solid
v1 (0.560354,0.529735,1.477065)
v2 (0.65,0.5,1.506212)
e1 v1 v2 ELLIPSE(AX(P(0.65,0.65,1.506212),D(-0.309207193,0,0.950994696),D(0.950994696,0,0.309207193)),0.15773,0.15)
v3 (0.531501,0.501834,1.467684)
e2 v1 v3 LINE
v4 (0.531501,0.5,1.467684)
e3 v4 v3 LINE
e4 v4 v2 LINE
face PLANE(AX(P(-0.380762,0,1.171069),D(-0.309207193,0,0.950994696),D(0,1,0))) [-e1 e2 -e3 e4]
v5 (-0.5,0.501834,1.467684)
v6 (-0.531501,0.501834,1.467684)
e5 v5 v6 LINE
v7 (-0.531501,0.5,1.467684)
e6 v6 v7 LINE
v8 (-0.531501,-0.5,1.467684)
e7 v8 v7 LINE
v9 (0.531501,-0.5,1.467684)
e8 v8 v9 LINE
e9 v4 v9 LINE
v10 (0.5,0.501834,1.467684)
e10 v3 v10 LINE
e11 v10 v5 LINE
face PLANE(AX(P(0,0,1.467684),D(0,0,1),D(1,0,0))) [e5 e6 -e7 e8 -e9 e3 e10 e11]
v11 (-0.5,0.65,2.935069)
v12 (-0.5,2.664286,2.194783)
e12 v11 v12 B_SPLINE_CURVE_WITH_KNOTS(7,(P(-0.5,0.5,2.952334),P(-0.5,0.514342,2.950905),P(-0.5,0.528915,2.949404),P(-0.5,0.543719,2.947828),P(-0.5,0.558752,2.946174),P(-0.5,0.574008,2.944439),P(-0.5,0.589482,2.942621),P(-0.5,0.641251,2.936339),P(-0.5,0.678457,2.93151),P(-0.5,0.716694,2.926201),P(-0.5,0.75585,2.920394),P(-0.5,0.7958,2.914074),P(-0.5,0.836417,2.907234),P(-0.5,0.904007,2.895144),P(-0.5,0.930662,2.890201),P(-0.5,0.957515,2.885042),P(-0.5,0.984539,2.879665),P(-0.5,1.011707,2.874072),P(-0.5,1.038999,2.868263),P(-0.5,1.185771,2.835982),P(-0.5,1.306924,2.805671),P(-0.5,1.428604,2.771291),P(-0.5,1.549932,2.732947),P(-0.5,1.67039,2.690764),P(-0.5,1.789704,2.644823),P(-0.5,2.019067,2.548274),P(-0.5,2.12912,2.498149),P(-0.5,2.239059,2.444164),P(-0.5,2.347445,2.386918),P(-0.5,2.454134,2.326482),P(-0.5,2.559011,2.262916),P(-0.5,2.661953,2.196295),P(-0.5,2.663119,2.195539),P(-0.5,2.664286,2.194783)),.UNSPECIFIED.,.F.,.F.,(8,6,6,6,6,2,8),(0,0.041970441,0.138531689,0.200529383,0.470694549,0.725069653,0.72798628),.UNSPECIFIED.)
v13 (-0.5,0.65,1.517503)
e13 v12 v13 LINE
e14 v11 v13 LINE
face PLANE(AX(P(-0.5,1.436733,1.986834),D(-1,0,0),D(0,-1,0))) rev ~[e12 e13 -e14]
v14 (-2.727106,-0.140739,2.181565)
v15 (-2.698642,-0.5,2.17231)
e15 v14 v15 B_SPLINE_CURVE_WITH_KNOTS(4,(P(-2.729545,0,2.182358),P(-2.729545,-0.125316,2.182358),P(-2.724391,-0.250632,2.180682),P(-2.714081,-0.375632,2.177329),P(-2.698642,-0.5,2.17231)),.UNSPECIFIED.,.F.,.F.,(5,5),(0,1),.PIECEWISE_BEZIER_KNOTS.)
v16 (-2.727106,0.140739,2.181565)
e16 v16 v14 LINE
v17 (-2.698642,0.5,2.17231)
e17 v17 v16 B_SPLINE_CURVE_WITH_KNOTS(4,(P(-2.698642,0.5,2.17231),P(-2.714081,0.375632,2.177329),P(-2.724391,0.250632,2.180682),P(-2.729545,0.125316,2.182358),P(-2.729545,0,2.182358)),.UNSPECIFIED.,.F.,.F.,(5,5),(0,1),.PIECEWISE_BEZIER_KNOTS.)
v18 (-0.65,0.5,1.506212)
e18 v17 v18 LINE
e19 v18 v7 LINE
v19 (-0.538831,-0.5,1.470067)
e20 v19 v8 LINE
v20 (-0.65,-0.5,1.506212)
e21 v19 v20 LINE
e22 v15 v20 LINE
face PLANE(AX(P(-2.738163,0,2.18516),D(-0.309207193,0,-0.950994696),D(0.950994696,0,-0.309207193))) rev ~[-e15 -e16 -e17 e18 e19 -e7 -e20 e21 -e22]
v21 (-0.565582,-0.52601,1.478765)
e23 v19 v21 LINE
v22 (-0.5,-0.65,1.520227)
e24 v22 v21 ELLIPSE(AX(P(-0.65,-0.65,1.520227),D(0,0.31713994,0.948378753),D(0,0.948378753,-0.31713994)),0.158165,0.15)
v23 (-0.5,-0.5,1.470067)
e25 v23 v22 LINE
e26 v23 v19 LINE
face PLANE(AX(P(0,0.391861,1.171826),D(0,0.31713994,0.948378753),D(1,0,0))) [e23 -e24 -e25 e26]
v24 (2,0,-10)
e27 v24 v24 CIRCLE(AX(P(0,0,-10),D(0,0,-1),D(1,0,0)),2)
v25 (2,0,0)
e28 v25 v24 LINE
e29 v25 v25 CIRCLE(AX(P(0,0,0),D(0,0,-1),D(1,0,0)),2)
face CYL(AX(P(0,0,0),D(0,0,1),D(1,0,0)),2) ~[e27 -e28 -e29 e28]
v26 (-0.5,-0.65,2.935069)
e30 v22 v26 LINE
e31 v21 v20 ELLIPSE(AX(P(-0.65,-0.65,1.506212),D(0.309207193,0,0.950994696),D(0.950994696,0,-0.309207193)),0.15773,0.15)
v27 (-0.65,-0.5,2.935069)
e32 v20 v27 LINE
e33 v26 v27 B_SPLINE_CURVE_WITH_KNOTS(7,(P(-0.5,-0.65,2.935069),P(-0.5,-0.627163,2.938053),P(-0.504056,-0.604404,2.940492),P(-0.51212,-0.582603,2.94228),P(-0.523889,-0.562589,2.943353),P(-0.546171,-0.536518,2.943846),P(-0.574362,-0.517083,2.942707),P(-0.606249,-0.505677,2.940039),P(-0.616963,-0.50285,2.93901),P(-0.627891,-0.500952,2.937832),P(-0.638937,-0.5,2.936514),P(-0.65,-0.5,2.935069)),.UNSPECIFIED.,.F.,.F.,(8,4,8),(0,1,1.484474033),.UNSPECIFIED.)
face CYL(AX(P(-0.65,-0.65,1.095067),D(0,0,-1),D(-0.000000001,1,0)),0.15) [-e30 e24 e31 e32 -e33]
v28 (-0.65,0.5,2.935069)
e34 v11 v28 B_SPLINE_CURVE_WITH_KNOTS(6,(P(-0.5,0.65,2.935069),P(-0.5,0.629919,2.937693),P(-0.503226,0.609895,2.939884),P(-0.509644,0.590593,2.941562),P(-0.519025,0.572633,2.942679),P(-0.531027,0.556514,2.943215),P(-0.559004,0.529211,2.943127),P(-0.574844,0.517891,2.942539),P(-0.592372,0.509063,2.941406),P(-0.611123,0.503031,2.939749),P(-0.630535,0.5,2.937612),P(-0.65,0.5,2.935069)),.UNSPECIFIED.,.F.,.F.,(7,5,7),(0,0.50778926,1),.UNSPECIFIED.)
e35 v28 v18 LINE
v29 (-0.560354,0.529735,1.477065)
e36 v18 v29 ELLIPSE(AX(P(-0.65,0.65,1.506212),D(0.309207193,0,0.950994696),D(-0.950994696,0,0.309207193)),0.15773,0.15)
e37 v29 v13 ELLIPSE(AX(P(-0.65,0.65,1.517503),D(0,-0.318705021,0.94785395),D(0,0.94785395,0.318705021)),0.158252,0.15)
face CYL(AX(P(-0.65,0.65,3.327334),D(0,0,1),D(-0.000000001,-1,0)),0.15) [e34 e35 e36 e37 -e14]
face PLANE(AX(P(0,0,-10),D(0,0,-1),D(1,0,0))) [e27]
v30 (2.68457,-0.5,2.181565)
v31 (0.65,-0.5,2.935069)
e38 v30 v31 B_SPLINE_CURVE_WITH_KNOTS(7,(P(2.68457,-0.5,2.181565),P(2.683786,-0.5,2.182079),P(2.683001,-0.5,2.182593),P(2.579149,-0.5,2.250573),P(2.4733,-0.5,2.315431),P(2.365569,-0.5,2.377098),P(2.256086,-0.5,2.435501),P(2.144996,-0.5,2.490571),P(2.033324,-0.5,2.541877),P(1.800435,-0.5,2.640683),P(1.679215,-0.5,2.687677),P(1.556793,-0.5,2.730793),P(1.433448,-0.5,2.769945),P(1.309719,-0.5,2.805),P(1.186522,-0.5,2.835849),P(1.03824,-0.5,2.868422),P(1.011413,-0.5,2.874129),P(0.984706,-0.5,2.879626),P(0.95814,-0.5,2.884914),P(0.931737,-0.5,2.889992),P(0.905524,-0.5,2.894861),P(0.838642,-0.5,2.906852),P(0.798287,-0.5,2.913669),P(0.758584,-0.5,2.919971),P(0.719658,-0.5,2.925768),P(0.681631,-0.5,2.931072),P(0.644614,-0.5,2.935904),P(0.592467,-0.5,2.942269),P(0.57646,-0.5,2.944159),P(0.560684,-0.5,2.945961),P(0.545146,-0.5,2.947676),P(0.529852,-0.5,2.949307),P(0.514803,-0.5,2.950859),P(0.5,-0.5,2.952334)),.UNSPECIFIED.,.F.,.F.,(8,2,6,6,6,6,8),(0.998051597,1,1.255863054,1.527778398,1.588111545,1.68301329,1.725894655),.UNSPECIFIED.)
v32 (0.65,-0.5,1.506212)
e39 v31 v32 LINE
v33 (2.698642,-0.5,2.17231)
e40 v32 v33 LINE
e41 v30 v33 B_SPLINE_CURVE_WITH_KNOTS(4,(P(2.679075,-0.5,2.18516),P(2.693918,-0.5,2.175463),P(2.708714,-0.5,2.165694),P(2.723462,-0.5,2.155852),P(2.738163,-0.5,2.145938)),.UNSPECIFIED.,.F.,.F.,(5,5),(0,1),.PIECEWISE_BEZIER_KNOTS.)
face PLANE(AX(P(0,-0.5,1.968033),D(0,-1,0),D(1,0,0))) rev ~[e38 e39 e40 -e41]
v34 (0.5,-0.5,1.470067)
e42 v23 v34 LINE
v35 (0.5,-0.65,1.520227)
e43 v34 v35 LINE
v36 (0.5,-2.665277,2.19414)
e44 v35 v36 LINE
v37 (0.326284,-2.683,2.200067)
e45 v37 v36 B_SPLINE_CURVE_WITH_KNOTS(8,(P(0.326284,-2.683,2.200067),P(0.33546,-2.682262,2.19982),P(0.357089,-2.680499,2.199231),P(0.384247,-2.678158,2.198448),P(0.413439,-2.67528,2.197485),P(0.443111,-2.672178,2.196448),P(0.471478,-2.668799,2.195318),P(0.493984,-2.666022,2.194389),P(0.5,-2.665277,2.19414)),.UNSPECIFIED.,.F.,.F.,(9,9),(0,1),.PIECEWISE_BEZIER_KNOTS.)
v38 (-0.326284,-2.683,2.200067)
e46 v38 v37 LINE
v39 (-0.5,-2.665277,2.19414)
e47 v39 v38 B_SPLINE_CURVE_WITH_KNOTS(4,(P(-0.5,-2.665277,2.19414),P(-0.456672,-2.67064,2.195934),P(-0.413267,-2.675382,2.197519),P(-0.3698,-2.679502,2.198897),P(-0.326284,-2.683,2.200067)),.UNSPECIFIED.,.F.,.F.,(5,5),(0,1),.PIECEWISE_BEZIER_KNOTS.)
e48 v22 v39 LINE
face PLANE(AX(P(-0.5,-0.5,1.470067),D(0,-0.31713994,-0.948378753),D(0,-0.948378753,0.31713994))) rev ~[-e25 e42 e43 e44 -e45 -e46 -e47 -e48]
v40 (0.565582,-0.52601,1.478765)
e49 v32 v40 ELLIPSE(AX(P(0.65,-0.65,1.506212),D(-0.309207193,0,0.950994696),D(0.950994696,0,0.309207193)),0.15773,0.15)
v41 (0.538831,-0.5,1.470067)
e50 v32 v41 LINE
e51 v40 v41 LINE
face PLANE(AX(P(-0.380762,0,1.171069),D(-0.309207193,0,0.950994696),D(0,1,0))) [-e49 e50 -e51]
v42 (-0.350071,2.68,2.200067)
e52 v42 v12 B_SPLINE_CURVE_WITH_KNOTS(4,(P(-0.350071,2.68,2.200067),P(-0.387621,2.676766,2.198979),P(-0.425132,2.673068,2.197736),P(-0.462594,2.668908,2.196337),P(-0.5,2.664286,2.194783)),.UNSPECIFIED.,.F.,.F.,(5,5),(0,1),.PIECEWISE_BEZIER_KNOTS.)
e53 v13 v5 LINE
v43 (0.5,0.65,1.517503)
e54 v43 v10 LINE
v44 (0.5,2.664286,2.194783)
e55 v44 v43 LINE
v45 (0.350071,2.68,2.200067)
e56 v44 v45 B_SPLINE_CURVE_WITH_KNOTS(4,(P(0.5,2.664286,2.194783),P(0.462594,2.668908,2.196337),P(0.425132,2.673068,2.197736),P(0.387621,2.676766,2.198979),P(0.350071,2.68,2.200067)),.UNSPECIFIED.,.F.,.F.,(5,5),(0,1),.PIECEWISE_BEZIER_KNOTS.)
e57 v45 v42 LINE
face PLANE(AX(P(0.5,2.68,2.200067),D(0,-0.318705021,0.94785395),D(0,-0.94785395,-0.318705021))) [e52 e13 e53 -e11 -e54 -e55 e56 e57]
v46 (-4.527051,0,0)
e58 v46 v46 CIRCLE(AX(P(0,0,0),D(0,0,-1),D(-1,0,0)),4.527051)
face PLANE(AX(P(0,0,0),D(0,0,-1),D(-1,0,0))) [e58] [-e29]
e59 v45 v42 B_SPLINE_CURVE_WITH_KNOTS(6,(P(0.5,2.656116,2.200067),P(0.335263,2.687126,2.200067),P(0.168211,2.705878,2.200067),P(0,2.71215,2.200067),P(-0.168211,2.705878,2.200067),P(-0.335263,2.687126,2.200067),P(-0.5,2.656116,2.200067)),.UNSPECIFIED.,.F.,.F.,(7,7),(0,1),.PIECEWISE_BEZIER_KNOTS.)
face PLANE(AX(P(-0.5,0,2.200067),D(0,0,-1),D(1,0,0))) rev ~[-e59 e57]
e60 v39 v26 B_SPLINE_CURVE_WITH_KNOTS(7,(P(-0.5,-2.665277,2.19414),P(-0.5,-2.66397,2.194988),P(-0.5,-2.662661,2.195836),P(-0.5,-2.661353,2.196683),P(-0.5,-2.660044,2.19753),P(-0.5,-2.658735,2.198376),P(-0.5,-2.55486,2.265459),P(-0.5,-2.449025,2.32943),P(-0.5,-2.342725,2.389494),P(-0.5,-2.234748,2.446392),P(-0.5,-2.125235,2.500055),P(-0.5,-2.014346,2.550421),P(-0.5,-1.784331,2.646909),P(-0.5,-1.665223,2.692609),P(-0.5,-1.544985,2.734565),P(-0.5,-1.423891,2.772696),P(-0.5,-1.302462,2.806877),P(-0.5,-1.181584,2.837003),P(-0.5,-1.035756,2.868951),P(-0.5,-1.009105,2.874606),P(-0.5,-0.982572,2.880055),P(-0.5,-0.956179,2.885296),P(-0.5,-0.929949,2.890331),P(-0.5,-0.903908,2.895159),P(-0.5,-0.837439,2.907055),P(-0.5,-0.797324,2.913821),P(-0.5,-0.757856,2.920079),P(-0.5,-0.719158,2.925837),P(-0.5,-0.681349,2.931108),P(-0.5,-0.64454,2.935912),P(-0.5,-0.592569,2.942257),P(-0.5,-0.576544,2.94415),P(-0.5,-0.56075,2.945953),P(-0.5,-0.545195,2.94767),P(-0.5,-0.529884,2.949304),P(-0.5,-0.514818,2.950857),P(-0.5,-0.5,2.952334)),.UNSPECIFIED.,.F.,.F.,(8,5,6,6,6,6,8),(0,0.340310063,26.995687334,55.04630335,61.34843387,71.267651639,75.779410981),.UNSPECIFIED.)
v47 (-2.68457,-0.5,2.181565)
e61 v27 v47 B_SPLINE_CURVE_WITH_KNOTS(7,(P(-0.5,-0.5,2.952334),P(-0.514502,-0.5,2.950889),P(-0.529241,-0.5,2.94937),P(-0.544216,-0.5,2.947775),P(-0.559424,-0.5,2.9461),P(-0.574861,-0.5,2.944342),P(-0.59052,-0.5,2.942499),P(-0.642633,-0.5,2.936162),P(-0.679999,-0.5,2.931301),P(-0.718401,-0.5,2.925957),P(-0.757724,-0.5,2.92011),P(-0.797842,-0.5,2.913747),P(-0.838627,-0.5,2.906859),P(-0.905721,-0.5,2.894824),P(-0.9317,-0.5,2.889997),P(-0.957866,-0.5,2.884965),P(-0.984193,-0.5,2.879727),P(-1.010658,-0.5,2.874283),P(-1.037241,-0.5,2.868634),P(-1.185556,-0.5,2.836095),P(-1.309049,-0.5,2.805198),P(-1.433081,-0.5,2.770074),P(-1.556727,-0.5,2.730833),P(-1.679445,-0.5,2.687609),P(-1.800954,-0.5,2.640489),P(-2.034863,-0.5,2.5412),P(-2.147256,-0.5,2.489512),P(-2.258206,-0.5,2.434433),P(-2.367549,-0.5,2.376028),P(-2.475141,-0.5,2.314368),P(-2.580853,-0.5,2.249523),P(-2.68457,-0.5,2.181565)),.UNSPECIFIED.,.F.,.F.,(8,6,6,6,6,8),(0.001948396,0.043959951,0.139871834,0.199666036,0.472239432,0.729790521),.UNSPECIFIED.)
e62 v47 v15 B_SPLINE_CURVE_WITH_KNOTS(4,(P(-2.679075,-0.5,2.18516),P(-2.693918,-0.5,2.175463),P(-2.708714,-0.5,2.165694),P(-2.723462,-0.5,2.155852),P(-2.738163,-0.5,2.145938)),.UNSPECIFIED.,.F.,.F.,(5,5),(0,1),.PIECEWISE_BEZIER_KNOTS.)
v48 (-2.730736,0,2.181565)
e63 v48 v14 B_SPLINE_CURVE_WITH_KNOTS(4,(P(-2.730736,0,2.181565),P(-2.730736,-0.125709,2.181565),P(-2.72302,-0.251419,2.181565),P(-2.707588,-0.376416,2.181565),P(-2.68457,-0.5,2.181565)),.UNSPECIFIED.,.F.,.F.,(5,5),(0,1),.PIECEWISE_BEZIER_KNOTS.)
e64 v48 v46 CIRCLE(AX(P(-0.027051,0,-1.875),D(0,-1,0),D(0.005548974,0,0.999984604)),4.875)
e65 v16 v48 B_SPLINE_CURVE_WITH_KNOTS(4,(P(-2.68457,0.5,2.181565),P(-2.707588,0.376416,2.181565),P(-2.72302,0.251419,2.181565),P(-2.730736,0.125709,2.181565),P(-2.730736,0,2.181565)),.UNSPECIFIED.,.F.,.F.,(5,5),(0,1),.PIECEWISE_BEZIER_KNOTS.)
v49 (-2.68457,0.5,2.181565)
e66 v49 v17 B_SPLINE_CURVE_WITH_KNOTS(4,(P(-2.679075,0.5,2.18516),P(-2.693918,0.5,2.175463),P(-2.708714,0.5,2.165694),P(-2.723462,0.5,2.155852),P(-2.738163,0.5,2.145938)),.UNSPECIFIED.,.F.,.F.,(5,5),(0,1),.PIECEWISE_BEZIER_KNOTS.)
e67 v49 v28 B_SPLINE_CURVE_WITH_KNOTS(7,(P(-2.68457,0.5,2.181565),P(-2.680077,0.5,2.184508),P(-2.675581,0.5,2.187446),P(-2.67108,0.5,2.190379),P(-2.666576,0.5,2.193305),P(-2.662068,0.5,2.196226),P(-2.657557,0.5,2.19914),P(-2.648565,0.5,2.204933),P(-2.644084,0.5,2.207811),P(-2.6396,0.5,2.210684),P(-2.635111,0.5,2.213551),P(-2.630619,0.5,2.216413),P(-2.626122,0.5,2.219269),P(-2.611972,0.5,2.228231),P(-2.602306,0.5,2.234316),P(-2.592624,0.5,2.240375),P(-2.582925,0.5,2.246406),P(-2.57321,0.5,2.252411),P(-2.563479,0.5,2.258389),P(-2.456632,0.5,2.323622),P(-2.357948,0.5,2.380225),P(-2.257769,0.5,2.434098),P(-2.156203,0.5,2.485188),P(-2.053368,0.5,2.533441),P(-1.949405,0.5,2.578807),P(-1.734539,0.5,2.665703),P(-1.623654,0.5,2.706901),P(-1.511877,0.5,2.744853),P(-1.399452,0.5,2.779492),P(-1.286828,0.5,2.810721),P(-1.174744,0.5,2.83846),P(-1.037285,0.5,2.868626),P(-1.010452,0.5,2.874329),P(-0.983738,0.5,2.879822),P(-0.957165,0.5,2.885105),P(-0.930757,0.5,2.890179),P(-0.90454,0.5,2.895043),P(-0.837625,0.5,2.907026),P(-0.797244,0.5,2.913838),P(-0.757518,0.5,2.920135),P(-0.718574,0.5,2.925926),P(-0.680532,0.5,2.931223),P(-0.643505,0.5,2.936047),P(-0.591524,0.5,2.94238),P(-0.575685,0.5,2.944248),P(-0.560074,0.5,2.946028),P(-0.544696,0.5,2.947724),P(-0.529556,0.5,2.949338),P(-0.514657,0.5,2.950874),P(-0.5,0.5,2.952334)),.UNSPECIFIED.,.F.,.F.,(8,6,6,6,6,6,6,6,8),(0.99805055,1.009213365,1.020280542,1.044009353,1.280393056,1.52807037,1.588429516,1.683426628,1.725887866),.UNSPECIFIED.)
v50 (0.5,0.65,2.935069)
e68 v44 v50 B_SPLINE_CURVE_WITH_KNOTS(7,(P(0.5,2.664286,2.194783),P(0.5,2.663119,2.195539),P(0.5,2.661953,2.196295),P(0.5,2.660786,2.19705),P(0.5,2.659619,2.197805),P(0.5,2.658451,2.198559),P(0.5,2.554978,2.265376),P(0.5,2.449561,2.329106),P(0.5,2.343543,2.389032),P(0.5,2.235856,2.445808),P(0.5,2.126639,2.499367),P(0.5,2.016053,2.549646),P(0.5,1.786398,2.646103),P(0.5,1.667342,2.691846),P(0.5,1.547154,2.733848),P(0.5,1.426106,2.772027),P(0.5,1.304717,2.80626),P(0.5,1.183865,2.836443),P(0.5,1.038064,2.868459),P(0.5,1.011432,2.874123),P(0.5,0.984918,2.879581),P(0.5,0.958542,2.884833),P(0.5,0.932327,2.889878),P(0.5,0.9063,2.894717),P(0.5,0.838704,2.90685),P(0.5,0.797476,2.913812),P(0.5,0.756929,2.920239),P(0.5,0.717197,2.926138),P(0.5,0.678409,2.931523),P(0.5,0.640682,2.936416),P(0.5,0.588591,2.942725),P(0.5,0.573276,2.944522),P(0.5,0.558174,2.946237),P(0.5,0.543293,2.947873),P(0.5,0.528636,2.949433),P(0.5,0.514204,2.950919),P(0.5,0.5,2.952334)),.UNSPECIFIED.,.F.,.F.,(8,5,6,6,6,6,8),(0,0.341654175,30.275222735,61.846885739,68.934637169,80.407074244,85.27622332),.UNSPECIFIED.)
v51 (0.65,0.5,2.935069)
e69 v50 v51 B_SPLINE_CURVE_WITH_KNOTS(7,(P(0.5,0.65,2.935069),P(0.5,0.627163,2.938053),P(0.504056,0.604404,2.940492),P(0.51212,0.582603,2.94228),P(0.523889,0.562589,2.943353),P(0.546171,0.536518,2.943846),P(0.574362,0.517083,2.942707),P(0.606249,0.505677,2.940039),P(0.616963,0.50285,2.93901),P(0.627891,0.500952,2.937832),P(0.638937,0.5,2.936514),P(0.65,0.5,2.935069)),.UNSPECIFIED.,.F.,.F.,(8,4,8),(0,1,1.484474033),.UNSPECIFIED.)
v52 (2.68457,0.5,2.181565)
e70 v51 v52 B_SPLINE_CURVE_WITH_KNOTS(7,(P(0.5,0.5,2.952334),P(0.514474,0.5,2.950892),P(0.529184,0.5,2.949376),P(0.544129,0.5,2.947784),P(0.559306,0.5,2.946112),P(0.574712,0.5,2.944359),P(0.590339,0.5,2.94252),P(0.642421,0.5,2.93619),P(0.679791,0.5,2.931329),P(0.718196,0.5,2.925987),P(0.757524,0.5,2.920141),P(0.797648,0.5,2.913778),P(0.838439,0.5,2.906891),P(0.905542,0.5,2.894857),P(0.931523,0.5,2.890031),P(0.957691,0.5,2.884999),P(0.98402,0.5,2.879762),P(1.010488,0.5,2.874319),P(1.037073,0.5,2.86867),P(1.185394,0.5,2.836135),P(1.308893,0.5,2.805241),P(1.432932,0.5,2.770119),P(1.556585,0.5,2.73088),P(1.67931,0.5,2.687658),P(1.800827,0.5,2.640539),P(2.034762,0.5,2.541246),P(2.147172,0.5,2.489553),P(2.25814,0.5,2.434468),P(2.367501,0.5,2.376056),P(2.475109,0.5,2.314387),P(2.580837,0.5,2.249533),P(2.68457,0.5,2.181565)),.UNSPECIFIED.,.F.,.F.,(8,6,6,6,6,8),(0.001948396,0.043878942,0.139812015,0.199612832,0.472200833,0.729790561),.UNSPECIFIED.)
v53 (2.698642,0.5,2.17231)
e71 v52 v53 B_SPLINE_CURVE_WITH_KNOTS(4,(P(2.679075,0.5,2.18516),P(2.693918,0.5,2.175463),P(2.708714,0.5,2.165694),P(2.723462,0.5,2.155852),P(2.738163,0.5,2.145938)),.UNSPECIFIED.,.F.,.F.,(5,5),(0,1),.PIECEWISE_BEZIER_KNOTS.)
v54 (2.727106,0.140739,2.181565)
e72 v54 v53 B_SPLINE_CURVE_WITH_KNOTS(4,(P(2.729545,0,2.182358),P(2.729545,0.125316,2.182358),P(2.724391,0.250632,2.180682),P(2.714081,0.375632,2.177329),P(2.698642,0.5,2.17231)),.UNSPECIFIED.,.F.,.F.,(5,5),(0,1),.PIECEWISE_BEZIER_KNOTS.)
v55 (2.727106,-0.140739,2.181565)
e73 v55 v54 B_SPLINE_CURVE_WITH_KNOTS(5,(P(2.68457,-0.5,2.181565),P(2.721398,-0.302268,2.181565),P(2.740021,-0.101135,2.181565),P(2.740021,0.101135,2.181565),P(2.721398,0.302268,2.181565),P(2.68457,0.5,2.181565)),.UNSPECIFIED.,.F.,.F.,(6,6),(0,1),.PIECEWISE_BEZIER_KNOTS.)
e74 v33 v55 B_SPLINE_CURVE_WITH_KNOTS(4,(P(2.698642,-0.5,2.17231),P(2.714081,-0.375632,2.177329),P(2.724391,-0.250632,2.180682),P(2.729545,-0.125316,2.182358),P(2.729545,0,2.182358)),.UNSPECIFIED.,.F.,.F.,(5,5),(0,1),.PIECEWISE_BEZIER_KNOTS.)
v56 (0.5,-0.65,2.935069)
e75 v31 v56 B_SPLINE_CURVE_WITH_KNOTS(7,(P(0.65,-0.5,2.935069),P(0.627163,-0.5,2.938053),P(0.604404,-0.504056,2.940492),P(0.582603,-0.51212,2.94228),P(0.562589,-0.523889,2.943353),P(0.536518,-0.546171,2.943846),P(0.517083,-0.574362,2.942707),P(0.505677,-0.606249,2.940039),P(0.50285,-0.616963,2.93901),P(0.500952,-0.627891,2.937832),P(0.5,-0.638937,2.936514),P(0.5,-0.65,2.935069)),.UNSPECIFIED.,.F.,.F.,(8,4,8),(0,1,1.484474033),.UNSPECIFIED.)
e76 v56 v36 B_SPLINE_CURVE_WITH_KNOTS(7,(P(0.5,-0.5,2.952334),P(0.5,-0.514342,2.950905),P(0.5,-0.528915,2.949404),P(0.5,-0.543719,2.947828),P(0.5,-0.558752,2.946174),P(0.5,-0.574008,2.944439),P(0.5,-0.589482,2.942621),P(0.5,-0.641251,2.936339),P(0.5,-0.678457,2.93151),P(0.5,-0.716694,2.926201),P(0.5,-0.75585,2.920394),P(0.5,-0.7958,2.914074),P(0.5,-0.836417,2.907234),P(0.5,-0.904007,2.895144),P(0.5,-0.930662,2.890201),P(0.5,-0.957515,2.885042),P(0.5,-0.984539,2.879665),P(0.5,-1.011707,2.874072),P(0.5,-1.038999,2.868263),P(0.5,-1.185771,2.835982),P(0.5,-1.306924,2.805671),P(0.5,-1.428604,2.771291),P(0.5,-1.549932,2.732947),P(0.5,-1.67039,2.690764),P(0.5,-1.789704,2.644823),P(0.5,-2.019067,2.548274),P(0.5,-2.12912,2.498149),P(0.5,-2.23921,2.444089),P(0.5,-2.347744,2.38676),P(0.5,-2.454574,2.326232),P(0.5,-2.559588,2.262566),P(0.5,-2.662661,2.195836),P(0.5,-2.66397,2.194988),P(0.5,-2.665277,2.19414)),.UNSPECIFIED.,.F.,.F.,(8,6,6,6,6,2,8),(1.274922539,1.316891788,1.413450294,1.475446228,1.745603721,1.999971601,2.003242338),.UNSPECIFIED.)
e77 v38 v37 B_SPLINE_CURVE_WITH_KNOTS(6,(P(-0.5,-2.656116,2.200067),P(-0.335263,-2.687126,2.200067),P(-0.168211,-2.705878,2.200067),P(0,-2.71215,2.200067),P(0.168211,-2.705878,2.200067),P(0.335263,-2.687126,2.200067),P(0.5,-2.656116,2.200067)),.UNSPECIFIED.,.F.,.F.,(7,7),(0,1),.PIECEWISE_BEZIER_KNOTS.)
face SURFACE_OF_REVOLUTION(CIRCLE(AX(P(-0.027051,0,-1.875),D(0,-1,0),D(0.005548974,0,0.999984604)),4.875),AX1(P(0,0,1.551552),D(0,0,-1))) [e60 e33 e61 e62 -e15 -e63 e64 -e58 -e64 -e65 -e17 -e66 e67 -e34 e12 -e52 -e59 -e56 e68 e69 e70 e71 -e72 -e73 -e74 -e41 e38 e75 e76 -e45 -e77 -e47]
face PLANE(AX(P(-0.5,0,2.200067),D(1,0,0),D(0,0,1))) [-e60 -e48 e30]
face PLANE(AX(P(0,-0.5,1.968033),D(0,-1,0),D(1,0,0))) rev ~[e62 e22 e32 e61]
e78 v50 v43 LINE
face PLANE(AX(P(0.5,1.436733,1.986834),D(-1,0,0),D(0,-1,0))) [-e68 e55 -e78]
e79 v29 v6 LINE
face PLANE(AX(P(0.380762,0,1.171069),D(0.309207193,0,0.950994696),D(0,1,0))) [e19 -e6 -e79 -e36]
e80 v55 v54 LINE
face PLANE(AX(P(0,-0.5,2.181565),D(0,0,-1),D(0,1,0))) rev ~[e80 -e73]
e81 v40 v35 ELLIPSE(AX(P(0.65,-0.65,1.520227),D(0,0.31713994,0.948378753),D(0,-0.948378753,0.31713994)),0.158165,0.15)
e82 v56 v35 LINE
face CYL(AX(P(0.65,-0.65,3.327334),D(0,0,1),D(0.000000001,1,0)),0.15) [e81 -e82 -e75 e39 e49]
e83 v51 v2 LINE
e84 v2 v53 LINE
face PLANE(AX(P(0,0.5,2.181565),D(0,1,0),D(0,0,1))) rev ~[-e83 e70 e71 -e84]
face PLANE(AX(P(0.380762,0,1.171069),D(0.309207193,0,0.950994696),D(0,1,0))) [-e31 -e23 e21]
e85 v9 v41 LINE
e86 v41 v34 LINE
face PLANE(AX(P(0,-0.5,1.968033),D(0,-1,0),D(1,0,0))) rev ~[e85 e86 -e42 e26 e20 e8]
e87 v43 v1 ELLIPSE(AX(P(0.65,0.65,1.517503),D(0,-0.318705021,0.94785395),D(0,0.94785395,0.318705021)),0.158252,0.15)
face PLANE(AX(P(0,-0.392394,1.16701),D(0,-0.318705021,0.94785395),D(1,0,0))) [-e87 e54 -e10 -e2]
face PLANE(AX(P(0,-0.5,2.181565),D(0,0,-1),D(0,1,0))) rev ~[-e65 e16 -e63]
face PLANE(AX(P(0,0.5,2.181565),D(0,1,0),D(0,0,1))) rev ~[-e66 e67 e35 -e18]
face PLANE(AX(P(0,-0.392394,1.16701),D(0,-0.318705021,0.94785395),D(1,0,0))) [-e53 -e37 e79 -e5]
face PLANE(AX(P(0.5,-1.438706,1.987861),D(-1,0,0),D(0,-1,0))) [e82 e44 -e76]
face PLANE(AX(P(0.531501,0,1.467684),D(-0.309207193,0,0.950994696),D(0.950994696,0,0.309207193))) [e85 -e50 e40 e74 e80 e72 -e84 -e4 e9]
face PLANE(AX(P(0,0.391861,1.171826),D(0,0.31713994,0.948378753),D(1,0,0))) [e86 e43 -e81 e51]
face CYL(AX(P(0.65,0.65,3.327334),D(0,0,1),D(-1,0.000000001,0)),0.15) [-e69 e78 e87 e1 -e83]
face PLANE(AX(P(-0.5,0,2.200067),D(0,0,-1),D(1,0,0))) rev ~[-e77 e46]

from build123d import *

# Parameters (mm, degrees)
F3_R           = 2
F4_DEPTH       = 10
F5_W           = 1
F5_H           = 0.8
F6_DEPTH       = 3
F6_DEPTH_BACK  = 3
F7_W           = 1
F7_H           = 0.8
F8_DEPTH       = 3
F8_DEPTH_BACK  = 3
F10_DEPTH      = 0.5
F10_DEPTH_BACK = 0.5
F11_T4_DEPTH   = 1
F12_T1_DEPTH   = 1
F13_T4_DEPTH   = 2.2322667456
F13_T10_DEPTH  = 1.8596499945
F13_T16_DEPTH  = 2.2322667452
F13_T22_DEPTH  = 1.859649995


# Not quite as in the source:
# - a fillet or chamfer that OpenCascade refuses, or shapes differently, is made with other operations: its cross-section is extruded or revolved along the edge and cut away or added


with BuildPart() as f2:
    # F0 (on Front) → F2 (revolve)
    with BuildSketch(Plane.XZ):
        with BuildLine():
            Line((0, 0), (0, 2.9999249461))
            ThreePointArc((0, 2.9999249461), (-2.7199502547, 2.1887322683), (-4.5270512497, 0))
            Line((-4.5270512497, 0), (0, 0))
        make_face()
    revolve(axis=Axis((0, 0, 1.5515517443), (0, 0, -1)))

    # F3 (on face) → F4 (join)
    with BuildSketch(Plane(origin=(0, 0, 0), x_dir=(1, 0, 0), z_dir=(0, 0, -1))):
        Circle(F3_R)
    extrude(amount=F4_DEPTH)

    # F5 (on Front) → F6 (cut, two sides)
    with BuildSketch(Plane.XZ) as f6_sk:
        with Locations((0, 2.6000668348)):
            Rectangle(F5_W, F5_H)
    extrude(amount=-F6_DEPTH, mode=Mode.SUBTRACT)
    extrude(f6_sk.sketch, amount=F6_DEPTH_BACK, mode=Mode.SUBTRACT)

    # F7 (on Right) → F8 (cut, two sides)
    with BuildSketch(Plane.YZ) as f8_sk:
        with Locations((0, 2.5815645484)):
            Rectangle(F7_W, F7_H)
    extrude(amount=F8_DEPTH, mode=Mode.SUBTRACT)
    extrude(f8_sk.sketch, amount=-F8_DEPTH_BACK, mode=Mode.SUBTRACT)

    # F9 (on Front) → F10 (cut, two sides)
    with BuildSketch(Plane.XZ) as f10_sk:
        Polygon((0.5315009621, 1.4676835854), (2.7381633418, 2.1851595957), (-2.7381633418, 2.1851595957), (-0.5315009621, 1.4676835854), (0, 1.4676835854), align=None)
    extrude(amount=F10_DEPTH, mode=Mode.SUBTRACT)
    extrude(f10_sk.sketch, amount=-F10_DEPTH_BACK, mode=Mode.SUBTRACT)

    # F11: chamfer of 0.733 x 2.18 on 1 edges, made by hand


with BuildPart() as f11_tool2:
    # F11_s3 → F11_t4 (new body)
    with BuildSketch(Plane.YZ.offset(0.5)):
        Polygon((2.68, 2.2000668348), (0.5, 1.4670668348), (0.5, 2.2000668348), align=None)
    extrude(amount=-F11_T4_DEPTH)

    split(bisect_by=Plane.XY.offset(1.4676835854), keep=Keep.TOP)


with BuildPart() as f2_1:
    add(f2.part)

    # F11_t1: cut F11_tool2
    add(f11_tool2.part, mode=Mode.SUBTRACT)

    # F12: chamfer of 2.183 x 0.73 on 1 edges, made by hand

    # F12_s2 → F12_t1 (cut)
    with BuildSketch(Plane.YZ.offset(-0.5)):
        Polygon((-0.5, 1.4700668348), (-2.683, 2.2000668348), (-0.5, 2.2000668348), align=None)
    extrude(amount=F12_T1_DEPTH, mode=Mode.SUBTRACT)

    # F13: fillet of radius 0.15 on 4 edges, made by hand


with BuildPart() as f13_tool2:
    # F13_s3 → F13_t4 (new body)
    with BuildSketch(Plane.XY.offset(3.3273335804)):
        with BuildLine():
            ThreePointArc((0.65, -0.5), (0.5439339828, -0.5439339828), (0.5, -0.65))
            Line((0.5, -0.65), (0.5, -0.5))
            Line((0.5, -0.5), (0.65, -0.5))
        make_face()
    extrude(amount=-F13_T4_DEPTH)

    split(bisect_by=Plane(origin=(-0.3807624945, 0, 1.1710694992), x_dir=(0, 1, 0), z_dir=(-0.309207193, 0, 0.950994696)), keep=Keep.TOP)

    split(bisect_by=Plane(origin=(0, 0.3918613388, 1.1718264421), x_dir=(1, 0, 0), z_dir=(0, 0.3171399402, 0.9483787526)), keep=Keep.TOP)


with BuildPart() as f2_2:
    add(f2_1.part)

    # F13_t1: cut F13_tool2
    add(f13_tool2.part, mode=Mode.SUBTRACT)


with BuildPart() as f13_tool8:
    # F13_s9 → F13_t10 (new body)
    with BuildSketch(Plane.XY.offset(3.3273335799)):
        with BuildLine():
            ThreePointArc((0.5, 0.65), (0.5439339828, 0.5439339828), (0.65, 0.5))
            Line((0.65, 0.5), (0.5, 0.5))
            Line((0.5, 0.5), (0.5, 0.65))
        make_face()
    extrude(amount=-F13_T10_DEPTH)

    split(bisect_by=Plane(origin=(0, -0.3923936318, 1.16700971), x_dir=(1, 0, 0), z_dir=(0, -0.3187050207, 0.9478539496)), keep=Keep.TOP)

    split(bisect_by=Plane(origin=(-0.3807624945, 0, 1.1710694992), x_dir=(0, 1, 0), z_dir=(-0.309207193, 0, 0.950994696)), keep=Keep.TOP)


with BuildPart() as f2_3:
    add(f2_2.part)

    # F13_t7: cut F13_tool8
    add(f13_tool8.part, mode=Mode.SUBTRACT)


with BuildPart() as f13_tool14:
    # F13_s15 → F13_t16 (new body)
    with BuildSketch(Plane.XY.offset(1.0950668348)):
        with BuildLine():
            ThreePointArc((-0.65, -0.5), (-0.5439339828, -0.5439339828), (-0.5, -0.65))
            Line((-0.5, -0.65), (-0.5, -0.5))
            Line((-0.5, -0.5), (-0.65, -0.5))
        make_face()
    extrude(amount=F13_T16_DEPTH)

    split(bisect_by=Plane(origin=(0.3807624945, 0, 1.1710694992), x_dir=(0, 1, 0), z_dir=(0.309207193, 0, 0.950994696)), keep=Keep.TOP)

    split(bisect_by=Plane(origin=(0, 0.3918613388, 1.1718264421), x_dir=(1, 0, 0), z_dir=(0, 0.3171399402, 0.9483787526)), keep=Keep.TOP)


with BuildPart() as f2_4:
    add(f2_3.part)

    # F13_t13: cut F13_tool14
    add(f13_tool14.part, mode=Mode.SUBTRACT)


with BuildPart() as f13_tool20:
    # F13_s21 → F13_t22 (new body)
    with BuildSketch(Plane.XY.offset(3.3273335804)):
        with BuildLine():
            ThreePointArc((-0.65, 0.5), (-0.5439339828, 0.5439339828), (-0.5, 0.65))
            Line((-0.5, 0.65), (-0.5, 0.5))
            Line((-0.5, 0.5), (-0.65, 0.5))
        make_face()
    extrude(amount=-F13_T22_DEPTH)

    split(bisect_by=Plane(origin=(0.3807624945, 0, 1.1710694992), x_dir=(0, 1, 0), z_dir=(0.309207193, 0, 0.950994696)), keep=Keep.TOP)

    split(bisect_by=Plane(origin=(0, -0.3923936318, 1.16700971), x_dir=(1, 0, 0), z_dir=(0, -0.3187050207, 0.9478539496)), keep=Keep.TOP)


with BuildPart() as f2_5:
    add(f2_4.part)

    # F13_t19: cut F13_tool20
    add(f13_tool20.part, mode=Mode.SUBTRACT)


solid = f2_5.part
